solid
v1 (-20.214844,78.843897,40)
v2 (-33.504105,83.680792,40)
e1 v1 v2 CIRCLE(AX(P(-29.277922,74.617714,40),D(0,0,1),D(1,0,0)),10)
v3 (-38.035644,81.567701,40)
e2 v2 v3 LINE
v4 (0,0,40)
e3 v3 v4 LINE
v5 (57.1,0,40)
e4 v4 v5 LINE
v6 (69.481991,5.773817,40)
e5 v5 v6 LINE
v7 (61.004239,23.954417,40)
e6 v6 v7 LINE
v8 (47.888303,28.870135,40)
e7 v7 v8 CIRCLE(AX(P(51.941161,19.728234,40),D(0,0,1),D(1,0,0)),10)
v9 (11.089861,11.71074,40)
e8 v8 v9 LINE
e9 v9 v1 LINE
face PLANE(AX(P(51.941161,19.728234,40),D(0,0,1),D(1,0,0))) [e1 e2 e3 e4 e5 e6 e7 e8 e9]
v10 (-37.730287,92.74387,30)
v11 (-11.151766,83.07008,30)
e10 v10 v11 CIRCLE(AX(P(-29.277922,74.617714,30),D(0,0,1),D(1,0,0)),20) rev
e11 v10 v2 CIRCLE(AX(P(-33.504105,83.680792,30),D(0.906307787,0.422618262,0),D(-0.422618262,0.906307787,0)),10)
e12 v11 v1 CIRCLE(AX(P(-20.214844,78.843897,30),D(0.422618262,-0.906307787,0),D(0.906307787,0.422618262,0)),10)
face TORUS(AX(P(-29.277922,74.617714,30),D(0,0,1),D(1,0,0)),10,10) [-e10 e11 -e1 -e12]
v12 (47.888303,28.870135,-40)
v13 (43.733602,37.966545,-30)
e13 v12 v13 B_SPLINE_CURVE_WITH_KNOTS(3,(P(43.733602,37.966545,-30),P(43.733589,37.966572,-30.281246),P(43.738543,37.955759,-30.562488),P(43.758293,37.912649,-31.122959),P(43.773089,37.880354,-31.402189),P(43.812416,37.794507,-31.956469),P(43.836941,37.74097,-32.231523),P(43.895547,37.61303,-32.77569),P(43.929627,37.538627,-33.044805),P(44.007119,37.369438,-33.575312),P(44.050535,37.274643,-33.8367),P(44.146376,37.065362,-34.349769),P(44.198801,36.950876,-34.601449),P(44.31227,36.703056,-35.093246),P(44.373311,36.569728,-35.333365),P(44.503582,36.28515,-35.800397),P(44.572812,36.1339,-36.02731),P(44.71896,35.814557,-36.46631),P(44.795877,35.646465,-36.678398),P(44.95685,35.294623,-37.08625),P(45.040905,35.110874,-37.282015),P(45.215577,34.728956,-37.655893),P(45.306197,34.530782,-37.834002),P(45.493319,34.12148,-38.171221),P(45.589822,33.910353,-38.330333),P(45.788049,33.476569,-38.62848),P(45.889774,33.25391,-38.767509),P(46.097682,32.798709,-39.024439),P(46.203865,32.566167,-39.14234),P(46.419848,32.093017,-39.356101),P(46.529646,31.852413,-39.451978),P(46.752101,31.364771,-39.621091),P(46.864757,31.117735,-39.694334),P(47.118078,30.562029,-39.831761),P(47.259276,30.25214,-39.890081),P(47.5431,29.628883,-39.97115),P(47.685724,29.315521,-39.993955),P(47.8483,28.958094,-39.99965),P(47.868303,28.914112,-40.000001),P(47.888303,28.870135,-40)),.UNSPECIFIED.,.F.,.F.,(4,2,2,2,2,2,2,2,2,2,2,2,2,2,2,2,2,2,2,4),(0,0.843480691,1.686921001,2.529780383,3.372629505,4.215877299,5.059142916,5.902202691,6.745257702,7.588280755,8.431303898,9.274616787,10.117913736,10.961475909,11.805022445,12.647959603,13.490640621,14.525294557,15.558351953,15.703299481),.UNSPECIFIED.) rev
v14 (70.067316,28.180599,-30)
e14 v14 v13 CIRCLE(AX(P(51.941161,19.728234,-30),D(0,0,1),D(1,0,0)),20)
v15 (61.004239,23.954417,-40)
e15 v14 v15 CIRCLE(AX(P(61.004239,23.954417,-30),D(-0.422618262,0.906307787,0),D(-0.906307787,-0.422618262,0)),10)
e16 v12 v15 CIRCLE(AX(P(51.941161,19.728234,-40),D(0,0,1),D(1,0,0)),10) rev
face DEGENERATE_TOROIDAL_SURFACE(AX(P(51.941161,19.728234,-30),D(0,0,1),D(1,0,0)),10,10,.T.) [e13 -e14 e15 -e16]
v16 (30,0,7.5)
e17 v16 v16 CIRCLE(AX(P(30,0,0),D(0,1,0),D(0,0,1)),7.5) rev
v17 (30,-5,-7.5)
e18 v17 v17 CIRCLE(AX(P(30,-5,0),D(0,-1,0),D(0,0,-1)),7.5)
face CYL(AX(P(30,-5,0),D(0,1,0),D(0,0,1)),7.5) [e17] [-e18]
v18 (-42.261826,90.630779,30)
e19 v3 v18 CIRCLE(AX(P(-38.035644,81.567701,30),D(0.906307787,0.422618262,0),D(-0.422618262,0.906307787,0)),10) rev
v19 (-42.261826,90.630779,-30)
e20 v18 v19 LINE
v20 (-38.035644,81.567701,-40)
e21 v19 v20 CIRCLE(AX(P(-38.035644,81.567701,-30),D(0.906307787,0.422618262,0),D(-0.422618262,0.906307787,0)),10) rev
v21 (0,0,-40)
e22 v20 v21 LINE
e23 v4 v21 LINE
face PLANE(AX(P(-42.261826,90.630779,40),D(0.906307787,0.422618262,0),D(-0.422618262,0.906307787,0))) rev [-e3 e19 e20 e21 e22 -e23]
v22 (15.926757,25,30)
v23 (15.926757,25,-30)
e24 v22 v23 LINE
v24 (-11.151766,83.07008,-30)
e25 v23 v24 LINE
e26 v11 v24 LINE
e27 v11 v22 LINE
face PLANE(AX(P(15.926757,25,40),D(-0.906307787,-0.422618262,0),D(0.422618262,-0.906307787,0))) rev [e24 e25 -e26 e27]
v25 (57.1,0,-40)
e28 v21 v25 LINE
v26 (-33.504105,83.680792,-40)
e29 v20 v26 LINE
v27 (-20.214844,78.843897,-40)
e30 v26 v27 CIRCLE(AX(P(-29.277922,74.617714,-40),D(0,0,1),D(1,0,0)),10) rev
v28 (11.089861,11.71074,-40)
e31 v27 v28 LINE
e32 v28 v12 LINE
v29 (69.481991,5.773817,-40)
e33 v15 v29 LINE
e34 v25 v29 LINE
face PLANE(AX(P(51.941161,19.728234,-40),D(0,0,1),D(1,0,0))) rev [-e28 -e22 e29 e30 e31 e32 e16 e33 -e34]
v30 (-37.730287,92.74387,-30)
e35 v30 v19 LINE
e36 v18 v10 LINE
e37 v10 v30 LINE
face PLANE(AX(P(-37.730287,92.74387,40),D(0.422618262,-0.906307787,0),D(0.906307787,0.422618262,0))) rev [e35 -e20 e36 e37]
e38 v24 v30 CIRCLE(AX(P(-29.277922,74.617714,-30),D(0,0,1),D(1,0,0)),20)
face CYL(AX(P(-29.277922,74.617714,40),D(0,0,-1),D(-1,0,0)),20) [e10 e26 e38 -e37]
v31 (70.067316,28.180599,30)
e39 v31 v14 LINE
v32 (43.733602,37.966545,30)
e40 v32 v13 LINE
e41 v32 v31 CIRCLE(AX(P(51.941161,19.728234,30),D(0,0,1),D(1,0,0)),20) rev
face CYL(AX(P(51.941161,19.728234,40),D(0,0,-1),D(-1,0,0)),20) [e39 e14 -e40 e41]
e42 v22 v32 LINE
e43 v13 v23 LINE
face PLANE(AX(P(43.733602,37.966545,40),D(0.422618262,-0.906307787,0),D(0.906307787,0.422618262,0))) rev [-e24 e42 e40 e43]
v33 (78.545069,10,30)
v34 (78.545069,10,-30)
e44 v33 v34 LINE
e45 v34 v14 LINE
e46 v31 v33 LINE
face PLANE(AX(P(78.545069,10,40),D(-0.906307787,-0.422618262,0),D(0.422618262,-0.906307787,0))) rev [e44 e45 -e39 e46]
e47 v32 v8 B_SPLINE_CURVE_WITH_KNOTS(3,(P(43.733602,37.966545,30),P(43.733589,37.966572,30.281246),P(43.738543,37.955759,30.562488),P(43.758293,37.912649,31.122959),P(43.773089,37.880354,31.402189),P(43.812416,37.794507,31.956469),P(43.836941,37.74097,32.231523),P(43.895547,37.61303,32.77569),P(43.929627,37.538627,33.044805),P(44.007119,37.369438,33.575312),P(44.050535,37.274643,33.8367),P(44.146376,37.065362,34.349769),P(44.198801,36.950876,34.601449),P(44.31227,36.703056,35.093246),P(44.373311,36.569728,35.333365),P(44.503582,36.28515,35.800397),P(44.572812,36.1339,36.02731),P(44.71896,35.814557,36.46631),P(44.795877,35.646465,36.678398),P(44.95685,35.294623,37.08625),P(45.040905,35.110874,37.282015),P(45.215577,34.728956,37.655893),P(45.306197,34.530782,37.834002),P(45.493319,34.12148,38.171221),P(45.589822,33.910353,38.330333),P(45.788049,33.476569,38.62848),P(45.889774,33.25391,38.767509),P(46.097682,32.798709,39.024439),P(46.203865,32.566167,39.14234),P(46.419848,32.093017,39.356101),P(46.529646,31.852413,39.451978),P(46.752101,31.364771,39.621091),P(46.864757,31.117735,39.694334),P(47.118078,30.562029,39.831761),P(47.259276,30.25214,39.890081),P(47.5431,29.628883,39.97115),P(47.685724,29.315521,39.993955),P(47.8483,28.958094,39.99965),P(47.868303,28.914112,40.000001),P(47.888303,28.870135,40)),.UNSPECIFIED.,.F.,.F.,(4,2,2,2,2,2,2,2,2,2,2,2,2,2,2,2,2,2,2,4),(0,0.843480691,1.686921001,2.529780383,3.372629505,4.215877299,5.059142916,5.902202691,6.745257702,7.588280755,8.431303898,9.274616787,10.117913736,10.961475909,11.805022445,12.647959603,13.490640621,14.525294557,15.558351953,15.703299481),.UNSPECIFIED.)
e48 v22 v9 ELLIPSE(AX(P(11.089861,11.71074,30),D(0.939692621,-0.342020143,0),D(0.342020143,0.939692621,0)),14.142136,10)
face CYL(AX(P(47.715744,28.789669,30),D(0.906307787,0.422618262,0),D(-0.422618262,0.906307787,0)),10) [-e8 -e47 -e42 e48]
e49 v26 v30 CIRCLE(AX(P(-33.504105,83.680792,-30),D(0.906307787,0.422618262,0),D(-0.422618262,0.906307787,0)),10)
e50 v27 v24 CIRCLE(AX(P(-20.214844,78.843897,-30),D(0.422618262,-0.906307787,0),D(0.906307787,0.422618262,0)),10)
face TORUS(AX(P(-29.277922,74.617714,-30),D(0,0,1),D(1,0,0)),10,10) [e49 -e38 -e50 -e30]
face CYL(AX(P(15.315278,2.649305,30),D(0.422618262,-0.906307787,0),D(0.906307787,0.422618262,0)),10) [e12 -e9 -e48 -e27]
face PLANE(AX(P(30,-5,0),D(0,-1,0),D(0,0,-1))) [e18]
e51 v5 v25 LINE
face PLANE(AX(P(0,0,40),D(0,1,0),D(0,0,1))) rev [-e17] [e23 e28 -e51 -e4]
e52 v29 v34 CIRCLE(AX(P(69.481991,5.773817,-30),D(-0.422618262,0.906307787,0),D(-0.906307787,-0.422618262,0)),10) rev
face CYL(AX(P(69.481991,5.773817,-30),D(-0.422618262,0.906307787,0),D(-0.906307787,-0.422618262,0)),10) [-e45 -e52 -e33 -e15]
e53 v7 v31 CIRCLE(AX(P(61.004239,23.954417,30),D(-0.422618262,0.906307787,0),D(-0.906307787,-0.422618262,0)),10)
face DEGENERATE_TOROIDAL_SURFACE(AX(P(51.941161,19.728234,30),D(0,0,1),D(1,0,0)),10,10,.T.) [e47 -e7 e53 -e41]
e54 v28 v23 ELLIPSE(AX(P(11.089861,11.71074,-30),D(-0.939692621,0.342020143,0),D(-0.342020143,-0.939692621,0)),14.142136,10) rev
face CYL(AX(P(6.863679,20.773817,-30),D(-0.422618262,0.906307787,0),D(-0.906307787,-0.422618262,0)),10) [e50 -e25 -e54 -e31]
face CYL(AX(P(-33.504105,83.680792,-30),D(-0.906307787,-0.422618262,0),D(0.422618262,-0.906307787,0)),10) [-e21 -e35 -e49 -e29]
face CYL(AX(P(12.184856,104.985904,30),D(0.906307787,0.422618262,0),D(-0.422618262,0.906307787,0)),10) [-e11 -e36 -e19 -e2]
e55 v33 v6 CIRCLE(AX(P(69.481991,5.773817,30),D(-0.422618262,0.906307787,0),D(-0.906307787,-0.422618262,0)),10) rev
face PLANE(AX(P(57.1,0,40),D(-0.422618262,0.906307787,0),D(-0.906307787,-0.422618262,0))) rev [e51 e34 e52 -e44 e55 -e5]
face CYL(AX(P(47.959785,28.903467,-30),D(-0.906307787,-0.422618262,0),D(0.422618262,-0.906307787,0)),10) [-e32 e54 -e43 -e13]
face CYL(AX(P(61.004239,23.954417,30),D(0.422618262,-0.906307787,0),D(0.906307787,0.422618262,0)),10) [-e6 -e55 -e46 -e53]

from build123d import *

# Parameters (mm, degrees)
BOSS_EXTRUDE1_DEPTH = 40
SKETCH2_R           = 7.5
BOSS_EXTRUDE2_DEPTH = 5
FILLET1_R           = 10


with BuildPart() as part:
    # Sketch1 → Boss-Extrude1 (new, symmetric)
    with BuildSketch(Plane.XY):
        with BuildLine():
            Line((-42.261826174, 90.630778704), (0, 0))
            Line((0, 0), (57.1, 0))
            Line((57.1, 0), (78.545069205, 10))
            Line((78.545069205, 10), (70.06731645, 28.180599453))
            ThreePointArc((70.06731645, 28.180599453), (58.907926391, 38.47561206), (43.733601964, 37.96654498))
            Line((43.733601964, 37.96654498), (15.92675652, 25))
            Line((15.92675652, 25), (-11.151766263, 83.070079506))
            ThreePointArc((-11.151766263, 83.070079506), (-22.437519138, 93.411566687), (-37.730287239, 92.743870012))
            Line((-37.730287239, 92.743870012), (-42.261826174, 90.630778704))
        make_face()
    extrude(amount=BOSS_EXTRUDE1_DEPTH, both=True)

    # Sketch2 → Boss-Extrude2 (add, symmetric)
    with BuildSketch(Plane.XZ):
        with Locations(Location((30, 0, 0), (0, 0, 90))):
            Circle(SKETCH2_R)
    extrude(amount=BOSS_EXTRUDE2_DEPTH, both=True)

    # Fillet1
    # the kernel refuses this fillet: 10 mm, written as the material it takes off along each edge
    with BuildSketch(Plane(origin=(43.733601964, 37.96654498, -40), x_dir=(0.42261826174070133, -0.9063077870366492, 0), z_dir=(-0.9063077870366492, -0.4226182617407013, 0))) as fillet1_piece_1:
        with BuildLine():
            CenterArc((FILLET1_R, FILLET1_R), FILLET1_R, 180, 90)
            Line((0, FILLET1_R), (0, 0))
            Line((0, 0), (FILLET1_R, 0))
        make_face()
    extrude(amount=30.681459259, mode=Mode.SUBTRACT)
    with BuildSketch(Plane(origin=(51.94116071, 19.728234218, -40), x_dir=(0.9063077870366498, 0.42261826174069983, 0), z_dir=(0.42261826174069983, -0.9063077870366498, 0))) as fillet1_piece_2:
        with BuildLine():
            CenterArc((20 - FILLET1_R, FILLET1_R), FILLET1_R, 270, 90)
            Line((20, FILLET1_R), (20, 0))
            Line((20, 0), (20 - FILLET1_R, 0))
        make_face()
    revolve(axis=Axis((51.94116071, 19.728234218, -40), (0, 0, 1)), revolution_arc=89.228578439, mode=Mode.SUBTRACT)
    with BuildSketch(Plane(origin=(89.110525749, -12.657694676, -40), x_dir=(-0.90630778703665, -0.4226182617406995, 0), z_dir=(-0.42261826174069944, 0.9063077870366499, 0))) as fillet1_piece_3:
        with BuildLine():
            CenterArc((FILLET1_R, FILLET1_R), FILLET1_R, 180, 90)
            Line((0, FILLET1_R), (0, 0))
            Line((0, 0), (FILLET1_R, 0))
        make_face()
    extrude(amount=45.06007199, mode=Mode.SUBTRACT)
    with BuildSketch(Plane(origin=(-37.730287239, 92.743870012, -40), x_dir=(0.4226182617406985, -0.9063077870366504, 0), z_dir=(-0.9063077870366504, -0.42261826174069855, 0))) as fillet1_piece_4:
        with BuildLine():
            CenterArc((FILLET1_R, FILLET1_R), FILLET1_R, 180, 90)
            Line((0, FILLET1_R), (0, 0))
            Line((0, 0), (FILLET1_R, 0))
        make_face()
    extrude(amount=30, mode=Mode.SUBTRACT)
    with BuildSketch(Plane(origin=(89.110525749, -12.657694676, 40), x_dir=(-0.90630778703665, -0.4226182617406995, 0), z_dir=(-0.42261826174069944, 0.9063077870366499, 0))) as fillet1_piece_5:
        with BuildLine():
            CenterArc((FILLET1_R, -FILLET1_R), FILLET1_R, 90, 90)
            Line((0, -FILLET1_R), (0, 0))
            Line((0, 0), (FILLET1_R, 0))
        make_face()
    extrude(amount=45.06007199, mode=Mode.SUBTRACT)
    with BuildSketch(Plane(origin=(51.94116071, 19.728234218, 40), x_dir=(0.9063077870366498, 0.42261826174069983, 0), z_dir=(0.42261826174069983, -0.9063077870366498, 0))) as fillet1_piece_6:
        with BuildLine():
            CenterArc((20 - FILLET1_R, -FILLET1_R), FILLET1_R, 0, 90)
            Line((20, -FILLET1_R), (20, 0))
            Line((20, 0), (20 - FILLET1_R, 0))
        make_face()
    revolve(axis=Axis((51.94116071, 19.728234218, 40), (0, 0, 1)), revolution_arc=89.228578439, mode=Mode.SUBTRACT)
    with BuildSketch(Plane(origin=(43.733601964, 37.96654498, 40), x_dir=(0.42261826174070133, -0.9063077870366492, 0), z_dir=(-0.9063077870366492, -0.4226182617407013, 0))) as fillet1_piece_7:
        with BuildLine():
            CenterArc((FILLET1_R, -FILLET1_R), FILLET1_R, 90, 90)
            Line((0, -FILLET1_R), (0, 0))
            Line((0, 0), (FILLET1_R, 0))
        make_face()
    extrude(amount=30.681459259, mode=Mode.SUBTRACT)
    with BuildSketch(Plane(origin=(15.92675652, 25, 40), x_dir=(-0.9063077870366495, -0.42261826174070066, 0), z_dir=(-0.42261826174070066, 0.9063077870366494, 0))) as fillet1_piece_8:
        with BuildLine():
            CenterArc((FILLET1_R, -FILLET1_R), FILLET1_R, 90, 90)
            Line((0, -FILLET1_R), (0, 0))
            Line((0, 0), (FILLET1_R, 0))
        make_face()
    extrude(amount=64.07324348, mode=Mode.SUBTRACT)
    with BuildSketch(Plane(origin=(-29.277922004, 74.617714272, 40), x_dir=(0.9063077870366488, 0.4226182617407019, 0), z_dir=(0.4226182617407019, -0.9063077870366488, 0))) as fillet1_piece_9:
        with BuildLine():
            CenterArc((20 - FILLET1_R, -FILLET1_R), FILLET1_R, 0, 90)
            Line((20, -FILLET1_R), (20, 0))
            Line((20, 0), (20 - FILLET1_R, 0))
        make_face()
    revolve(axis=Axis((-29.277922004, 74.617714272, 40), (0, 0, 1)), revolution_arc=90, mode=Mode.SUBTRACT)
    with BuildSketch(Plane(origin=(-37.730287239, 92.743870012, 40), x_dir=(0.4226182617406985, -0.9063077870366504, 0), z_dir=(-0.9063077870366504, -0.42261826174069855, 0))) as fillet1_piece_10:
        with BuildLine():
            CenterArc((FILLET1_R, -FILLET1_R), FILLET1_R, 90, 90)
            Line((0, -FILLET1_R), (0, 0))
            Line((0, 0), (FILLET1_R, 0))
        make_face()
    extrude(amount=30, mode=Mode.SUBTRACT)
    with BuildSketch(Plane(origin=(-29.277922004, 74.617714272, -40), x_dir=(0.9063077870366488, 0.4226182617407019, 0), z_dir=(0.4226182617407019, -0.9063077870366488, 0))) as fillet1_piece_11:
        with BuildLine():
            CenterArc((20 - FILLET1_R, FILLET1_R), FILLET1_R, 270, 90)
            Line((20, FILLET1_R), (20, 0))
            Line((20, 0), (20 - FILLET1_R, 0))
        make_face()
    revolve(axis=Axis((-29.277922004, 74.617714272, -40), (0, 0, 1)), revolution_arc=90, mode=Mode.SUBTRACT)
    with BuildSketch(Plane(origin=(15.92675652, 25, -40), x_dir=(-0.9063077870366495, -0.42261826174070066, 0), z_dir=(-0.42261826174070066, 0.9063077870366494, 0))) as fillet1_piece_12:
        with BuildLine():
            CenterArc((FILLET1_R, FILLET1_R), FILLET1_R, 180, 90)
            Line((0, FILLET1_R), (0, 0))
            Line((0, 0), (FILLET1_R, 0))
        make_face()
    extrude(amount=64.07324348, mode=Mode.SUBTRACT)
    with BuildSketch(Plane(origin=(43.733601964, 37.96654498, -40), x_dir=(0.42261826174070133, -0.9063077870366492, 0), z_dir=(-0.9063077870366492, -0.4226182617407013, 0))) as fillet1_piece_13a_section:
        with BuildLine():
            CenterArc((FILLET1_R, FILLET1_R), FILLET1_R, 180, 90)
            Line((0, FILLET1_R), (0, 0))
            Line((0, 0), (FILLET1_R, 0))
        make_face()
    fillet1_piece_13a = extrude(amount=55.681459259, mode=Mode.PRIVATE)
    fillet1_piece_13a = split(fillet1_piece_13a, bisect_by=Plane(origin=(16.883543617, 22.94816345, -37.736048857), z_dir=(-0.9063077870366494, -0.42261826174070066, 0)), keep=Keep.TOP, mode=Mode.PRIVATE)
    with BuildSketch(Plane(origin=(26.492213064, 2.342305324, -40), x_dir=(-0.9063077870366495, -0.42261826174070066, 0), z_dir=(-0.42261826174070066, 0.9063077870366494, 0))) as fillet1_piece_13b_section:
        with BuildLine():
            CenterArc((FILLET1_R, FILLET1_R), FILLET1_R, 180, 90)
            Line((0, FILLET1_R), (0, 0))
            Line((0, 0), (FILLET1_R, 0))
        make_face()
    fillet1_piece_13b = extrude(amount=89.07324348, mode=Mode.PRIVATE)
    fillet1_piece_13b = split(fillet1_piece_13b, bisect_by=Plane(origin=(13.87491997, 24.043212903, -37.736048857), z_dir=(0.4226182617407013, -0.9063077870366492, 0)), keep=Keep.TOP, mode=Mode.PRIVATE)
    fillet1_piece_13 = fillet1_piece_13a & fillet1_piece_13b
    add(fillet1_piece_13, mode=Mode.SUBTRACT)
    with BuildSketch(Plane(origin=(43.733601964, 37.96654498, 40), x_dir=(0.42261826174070133, -0.9063077870366492, 0), z_dir=(-0.9063077870366492, -0.4226182617407013, 0))) as fillet1_piece_14a_section:
        with BuildLine():
            CenterArc((FILLET1_R, -FILLET1_R), FILLET1_R, 90, 90)
            Line((0, -FILLET1_R), (0, 0))
            Line((0, 0), (FILLET1_R, 0))
        make_face()
    fillet1_piece_14a = extrude(amount=55.681459259, mode=Mode.PRIVATE)
    fillet1_piece_14a = split(fillet1_piece_14a, bisect_by=Plane(origin=(16.883543617, 22.94816345, 37.736048857), z_dir=(-0.9063077870366494, -0.42261826174070066, 0)), keep=Keep.TOP, mode=Mode.PRIVATE)
    with BuildSketch(Plane(origin=(26.492213064, 2.342305324, 40), x_dir=(-0.9063077870366495, -0.42261826174070066, 0), z_dir=(-0.42261826174070066, 0.9063077870366494, 0))) as fillet1_piece_14b_section:
        with BuildLine():
            CenterArc((FILLET1_R, -FILLET1_R), FILLET1_R, 90, 90)
            Line((0, -FILLET1_R), (0, 0))
            Line((0, 0), (FILLET1_R, 0))
        make_face()
    fillet1_piece_14b = extrude(amount=89.07324348, mode=Mode.PRIVATE)
    fillet1_piece_14b = split(fillet1_piece_14b, bisect_by=Plane(origin=(13.87491997, 24.043212903, 37.736048857), z_dir=(0.4226182617407013, -0.9063077870366492, 0)), keep=Keep.TOP, mode=Mode.PRIVATE)
    fillet1_piece_14 = fillet1_piece_14a & fillet1_piece_14b
    add(fillet1_piece_14, mode=Mode.SUBTRACT)


solid = part.part
